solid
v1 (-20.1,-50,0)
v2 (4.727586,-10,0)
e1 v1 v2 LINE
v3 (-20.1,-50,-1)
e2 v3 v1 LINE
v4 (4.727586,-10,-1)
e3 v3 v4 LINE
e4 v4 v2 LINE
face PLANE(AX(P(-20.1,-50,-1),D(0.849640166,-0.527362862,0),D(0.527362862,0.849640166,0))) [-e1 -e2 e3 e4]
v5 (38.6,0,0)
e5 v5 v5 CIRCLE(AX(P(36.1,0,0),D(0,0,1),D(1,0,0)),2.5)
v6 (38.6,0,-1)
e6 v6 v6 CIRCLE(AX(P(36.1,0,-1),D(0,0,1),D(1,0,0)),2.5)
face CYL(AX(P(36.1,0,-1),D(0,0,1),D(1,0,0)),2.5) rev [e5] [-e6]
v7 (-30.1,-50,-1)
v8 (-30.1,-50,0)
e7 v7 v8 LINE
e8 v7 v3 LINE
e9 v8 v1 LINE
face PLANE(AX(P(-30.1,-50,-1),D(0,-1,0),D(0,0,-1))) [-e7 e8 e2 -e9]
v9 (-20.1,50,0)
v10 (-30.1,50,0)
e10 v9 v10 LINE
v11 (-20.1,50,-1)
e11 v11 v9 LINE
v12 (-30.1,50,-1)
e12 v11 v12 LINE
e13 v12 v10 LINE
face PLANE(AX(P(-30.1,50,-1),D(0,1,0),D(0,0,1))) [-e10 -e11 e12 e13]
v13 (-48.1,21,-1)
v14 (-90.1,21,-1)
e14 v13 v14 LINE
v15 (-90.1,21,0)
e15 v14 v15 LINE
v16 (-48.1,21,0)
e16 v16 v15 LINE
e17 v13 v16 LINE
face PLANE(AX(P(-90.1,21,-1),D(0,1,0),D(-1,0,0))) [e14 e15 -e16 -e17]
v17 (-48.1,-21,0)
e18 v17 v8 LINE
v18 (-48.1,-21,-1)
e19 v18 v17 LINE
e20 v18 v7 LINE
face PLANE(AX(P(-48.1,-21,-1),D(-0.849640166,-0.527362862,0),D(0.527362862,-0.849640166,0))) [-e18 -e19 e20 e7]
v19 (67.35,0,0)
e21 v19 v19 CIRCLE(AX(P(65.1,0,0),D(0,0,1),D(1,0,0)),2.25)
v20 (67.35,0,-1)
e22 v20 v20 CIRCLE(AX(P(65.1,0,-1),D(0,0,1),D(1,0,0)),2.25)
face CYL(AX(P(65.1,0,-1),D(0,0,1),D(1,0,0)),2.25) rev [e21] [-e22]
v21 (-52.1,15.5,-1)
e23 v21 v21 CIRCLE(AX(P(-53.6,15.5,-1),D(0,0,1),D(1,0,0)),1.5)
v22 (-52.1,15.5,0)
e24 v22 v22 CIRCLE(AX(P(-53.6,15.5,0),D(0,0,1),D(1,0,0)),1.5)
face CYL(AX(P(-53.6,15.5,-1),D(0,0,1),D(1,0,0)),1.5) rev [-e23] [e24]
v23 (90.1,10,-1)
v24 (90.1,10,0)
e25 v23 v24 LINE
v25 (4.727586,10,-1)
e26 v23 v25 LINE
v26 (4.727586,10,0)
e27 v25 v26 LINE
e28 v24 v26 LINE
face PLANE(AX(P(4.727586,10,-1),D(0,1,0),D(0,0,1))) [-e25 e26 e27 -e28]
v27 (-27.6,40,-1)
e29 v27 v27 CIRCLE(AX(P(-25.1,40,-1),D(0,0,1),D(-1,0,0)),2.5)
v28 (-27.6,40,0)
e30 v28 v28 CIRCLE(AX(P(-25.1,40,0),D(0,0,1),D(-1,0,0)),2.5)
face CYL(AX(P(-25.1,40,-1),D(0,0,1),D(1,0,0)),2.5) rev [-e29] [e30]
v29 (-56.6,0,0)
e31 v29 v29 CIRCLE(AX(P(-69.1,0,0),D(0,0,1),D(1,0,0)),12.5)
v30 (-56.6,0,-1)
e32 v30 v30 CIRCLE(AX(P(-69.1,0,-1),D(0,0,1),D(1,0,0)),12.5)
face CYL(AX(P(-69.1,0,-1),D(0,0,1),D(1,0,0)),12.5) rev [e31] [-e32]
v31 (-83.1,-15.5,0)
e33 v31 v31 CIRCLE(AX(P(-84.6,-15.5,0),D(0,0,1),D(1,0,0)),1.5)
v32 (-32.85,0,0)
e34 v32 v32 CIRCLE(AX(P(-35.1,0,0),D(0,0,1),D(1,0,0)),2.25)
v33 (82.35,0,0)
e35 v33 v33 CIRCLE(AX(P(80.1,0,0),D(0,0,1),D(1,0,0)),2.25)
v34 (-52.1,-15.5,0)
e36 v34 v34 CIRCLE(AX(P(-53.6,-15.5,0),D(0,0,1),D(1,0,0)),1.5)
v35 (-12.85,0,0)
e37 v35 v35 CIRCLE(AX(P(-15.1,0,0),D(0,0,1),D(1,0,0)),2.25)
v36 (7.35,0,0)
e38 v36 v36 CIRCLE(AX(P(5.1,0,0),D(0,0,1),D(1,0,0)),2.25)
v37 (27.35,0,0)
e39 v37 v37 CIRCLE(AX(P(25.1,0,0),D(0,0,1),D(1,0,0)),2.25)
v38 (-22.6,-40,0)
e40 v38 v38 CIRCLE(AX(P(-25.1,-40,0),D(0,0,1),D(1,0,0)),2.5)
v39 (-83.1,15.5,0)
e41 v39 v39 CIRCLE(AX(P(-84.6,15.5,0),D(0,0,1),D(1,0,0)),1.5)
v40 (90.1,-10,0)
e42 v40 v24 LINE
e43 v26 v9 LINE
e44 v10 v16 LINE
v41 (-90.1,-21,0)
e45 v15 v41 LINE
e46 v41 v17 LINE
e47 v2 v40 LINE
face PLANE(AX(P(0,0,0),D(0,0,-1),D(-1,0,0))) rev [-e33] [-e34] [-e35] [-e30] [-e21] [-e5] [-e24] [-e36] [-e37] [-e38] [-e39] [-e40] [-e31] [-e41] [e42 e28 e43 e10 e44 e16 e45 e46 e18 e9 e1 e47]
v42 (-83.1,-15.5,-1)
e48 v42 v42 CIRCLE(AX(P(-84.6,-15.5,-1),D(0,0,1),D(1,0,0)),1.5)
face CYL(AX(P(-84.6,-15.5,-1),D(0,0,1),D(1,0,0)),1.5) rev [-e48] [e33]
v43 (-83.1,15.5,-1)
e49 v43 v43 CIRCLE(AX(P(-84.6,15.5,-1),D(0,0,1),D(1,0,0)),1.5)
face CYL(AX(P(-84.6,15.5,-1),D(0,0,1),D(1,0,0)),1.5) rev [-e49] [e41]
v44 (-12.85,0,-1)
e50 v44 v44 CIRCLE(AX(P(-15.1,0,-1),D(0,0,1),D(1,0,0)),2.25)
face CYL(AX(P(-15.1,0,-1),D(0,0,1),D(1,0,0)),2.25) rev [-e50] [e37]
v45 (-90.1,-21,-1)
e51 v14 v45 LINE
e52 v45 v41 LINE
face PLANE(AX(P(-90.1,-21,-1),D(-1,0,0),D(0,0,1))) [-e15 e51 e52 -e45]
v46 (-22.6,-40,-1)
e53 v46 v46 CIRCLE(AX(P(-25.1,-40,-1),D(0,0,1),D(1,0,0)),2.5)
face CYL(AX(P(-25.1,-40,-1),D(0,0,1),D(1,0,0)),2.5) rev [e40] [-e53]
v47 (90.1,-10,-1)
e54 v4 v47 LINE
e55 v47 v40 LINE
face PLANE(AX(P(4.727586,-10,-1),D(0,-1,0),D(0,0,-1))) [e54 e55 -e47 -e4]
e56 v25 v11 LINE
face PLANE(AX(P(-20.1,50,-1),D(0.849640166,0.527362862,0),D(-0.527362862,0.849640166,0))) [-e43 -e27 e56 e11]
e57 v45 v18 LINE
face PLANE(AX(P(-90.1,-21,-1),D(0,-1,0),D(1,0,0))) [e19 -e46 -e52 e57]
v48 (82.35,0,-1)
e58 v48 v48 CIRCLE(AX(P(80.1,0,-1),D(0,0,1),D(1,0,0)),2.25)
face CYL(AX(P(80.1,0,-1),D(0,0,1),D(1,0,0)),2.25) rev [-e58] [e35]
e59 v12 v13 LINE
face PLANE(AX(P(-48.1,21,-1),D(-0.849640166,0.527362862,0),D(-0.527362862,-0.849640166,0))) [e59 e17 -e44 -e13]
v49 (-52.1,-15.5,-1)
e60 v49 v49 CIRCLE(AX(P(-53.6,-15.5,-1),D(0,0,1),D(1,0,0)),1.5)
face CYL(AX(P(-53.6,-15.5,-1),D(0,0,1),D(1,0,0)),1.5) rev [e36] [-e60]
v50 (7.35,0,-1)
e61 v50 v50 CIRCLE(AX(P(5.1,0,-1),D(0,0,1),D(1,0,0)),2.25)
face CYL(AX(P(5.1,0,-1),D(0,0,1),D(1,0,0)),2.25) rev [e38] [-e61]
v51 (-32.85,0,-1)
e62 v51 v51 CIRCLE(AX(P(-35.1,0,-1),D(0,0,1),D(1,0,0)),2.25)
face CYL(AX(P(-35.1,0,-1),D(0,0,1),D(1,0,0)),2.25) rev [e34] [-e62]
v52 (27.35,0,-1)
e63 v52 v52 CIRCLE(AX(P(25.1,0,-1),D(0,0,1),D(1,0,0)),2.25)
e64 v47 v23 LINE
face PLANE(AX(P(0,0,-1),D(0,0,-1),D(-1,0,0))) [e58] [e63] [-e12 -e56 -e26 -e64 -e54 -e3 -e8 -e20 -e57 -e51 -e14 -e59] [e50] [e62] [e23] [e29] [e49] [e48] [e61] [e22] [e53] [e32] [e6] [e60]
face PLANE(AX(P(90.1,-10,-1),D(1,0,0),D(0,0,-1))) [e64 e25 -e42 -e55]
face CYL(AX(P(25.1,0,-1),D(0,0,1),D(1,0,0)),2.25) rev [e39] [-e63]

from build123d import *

# Parameters (mm, degrees)
SKETCH1_R          = 12.5
SKETCH1_R_2        = 1.5
SKETCH1_R_3        = 2.5
SKETCH1_R_4        = 2.25
BASE_FLANGE1_DEPTH = 1


# Sheet-metal steps are written as plain solids
with BuildPart() as part:
    # Sketch1 → Base-Flange1 (new body)
    with BuildSketch(Plane.XY):
        Polygon((-90.1, -21), (-48.1, -21), (-30.1, -50), (-20.1, -50), (4.727586207, -10), (90.1, -10), (90.1, 10), (4.727586207, 10), (-20.1, 50), (-30.1, 50), (-48.1, 21), (-90.1, 21), align=None)
        with Locations((-69.1, 0)):
            Circle(SKETCH1_R, mode=Mode.SUBTRACT)
        with Locations((-84.6, 15.5)):
            Circle(SKETCH1_R_2, mode=Mode.SUBTRACT)
        with Locations((-25.1, -40)):
            Circle(SKETCH1_R_3, mode=Mode.SUBTRACT)
        with Locations((80.1, 0)):
            Circle(SKETCH1_R_4, mode=Mode.SUBTRACT)
        with Locations((65.1, 0)):
            Circle(SKETCH1_R_4, mode=Mode.SUBTRACT)
        with Locations((25.1, 0)):
            Circle(SKETCH1_R_4, mode=Mode.SUBTRACT)
        with Locations((5.1, 0)):
            Circle(SKETCH1_R_4, mode=Mode.SUBTRACT)
        with Locations((36.1, 0)):
            Circle(SKETCH1_R_3, mode=Mode.SUBTRACT)
        with Locations(Location((-25.1, 40, 0), (0, 0, 180))):
            Circle(SKETCH1_R_3, mode=Mode.SUBTRACT)
        with Locations((-15.1, 0)):
            Circle(SKETCH1_R_4, mode=Mode.SUBTRACT)
        with Locations((-35.1, 0)):
            Circle(SKETCH1_R_4, mode=Mode.SUBTRACT)
        with Locations((-53.6, 15.5)):
            Circle(SKETCH1_R_2, mode=Mode.SUBTRACT)
        with Locations((-53.6, -15.5)):
            Circle(SKETCH1_R_2, mode=Mode.SUBTRACT)
        with Locations((-84.6, -15.5)):
            Circle(SKETCH1_R_2, mode=Mode.SUBTRACT)
    extrude(amount=-BASE_FLANGE1_DEPTH)


solid = part.part
